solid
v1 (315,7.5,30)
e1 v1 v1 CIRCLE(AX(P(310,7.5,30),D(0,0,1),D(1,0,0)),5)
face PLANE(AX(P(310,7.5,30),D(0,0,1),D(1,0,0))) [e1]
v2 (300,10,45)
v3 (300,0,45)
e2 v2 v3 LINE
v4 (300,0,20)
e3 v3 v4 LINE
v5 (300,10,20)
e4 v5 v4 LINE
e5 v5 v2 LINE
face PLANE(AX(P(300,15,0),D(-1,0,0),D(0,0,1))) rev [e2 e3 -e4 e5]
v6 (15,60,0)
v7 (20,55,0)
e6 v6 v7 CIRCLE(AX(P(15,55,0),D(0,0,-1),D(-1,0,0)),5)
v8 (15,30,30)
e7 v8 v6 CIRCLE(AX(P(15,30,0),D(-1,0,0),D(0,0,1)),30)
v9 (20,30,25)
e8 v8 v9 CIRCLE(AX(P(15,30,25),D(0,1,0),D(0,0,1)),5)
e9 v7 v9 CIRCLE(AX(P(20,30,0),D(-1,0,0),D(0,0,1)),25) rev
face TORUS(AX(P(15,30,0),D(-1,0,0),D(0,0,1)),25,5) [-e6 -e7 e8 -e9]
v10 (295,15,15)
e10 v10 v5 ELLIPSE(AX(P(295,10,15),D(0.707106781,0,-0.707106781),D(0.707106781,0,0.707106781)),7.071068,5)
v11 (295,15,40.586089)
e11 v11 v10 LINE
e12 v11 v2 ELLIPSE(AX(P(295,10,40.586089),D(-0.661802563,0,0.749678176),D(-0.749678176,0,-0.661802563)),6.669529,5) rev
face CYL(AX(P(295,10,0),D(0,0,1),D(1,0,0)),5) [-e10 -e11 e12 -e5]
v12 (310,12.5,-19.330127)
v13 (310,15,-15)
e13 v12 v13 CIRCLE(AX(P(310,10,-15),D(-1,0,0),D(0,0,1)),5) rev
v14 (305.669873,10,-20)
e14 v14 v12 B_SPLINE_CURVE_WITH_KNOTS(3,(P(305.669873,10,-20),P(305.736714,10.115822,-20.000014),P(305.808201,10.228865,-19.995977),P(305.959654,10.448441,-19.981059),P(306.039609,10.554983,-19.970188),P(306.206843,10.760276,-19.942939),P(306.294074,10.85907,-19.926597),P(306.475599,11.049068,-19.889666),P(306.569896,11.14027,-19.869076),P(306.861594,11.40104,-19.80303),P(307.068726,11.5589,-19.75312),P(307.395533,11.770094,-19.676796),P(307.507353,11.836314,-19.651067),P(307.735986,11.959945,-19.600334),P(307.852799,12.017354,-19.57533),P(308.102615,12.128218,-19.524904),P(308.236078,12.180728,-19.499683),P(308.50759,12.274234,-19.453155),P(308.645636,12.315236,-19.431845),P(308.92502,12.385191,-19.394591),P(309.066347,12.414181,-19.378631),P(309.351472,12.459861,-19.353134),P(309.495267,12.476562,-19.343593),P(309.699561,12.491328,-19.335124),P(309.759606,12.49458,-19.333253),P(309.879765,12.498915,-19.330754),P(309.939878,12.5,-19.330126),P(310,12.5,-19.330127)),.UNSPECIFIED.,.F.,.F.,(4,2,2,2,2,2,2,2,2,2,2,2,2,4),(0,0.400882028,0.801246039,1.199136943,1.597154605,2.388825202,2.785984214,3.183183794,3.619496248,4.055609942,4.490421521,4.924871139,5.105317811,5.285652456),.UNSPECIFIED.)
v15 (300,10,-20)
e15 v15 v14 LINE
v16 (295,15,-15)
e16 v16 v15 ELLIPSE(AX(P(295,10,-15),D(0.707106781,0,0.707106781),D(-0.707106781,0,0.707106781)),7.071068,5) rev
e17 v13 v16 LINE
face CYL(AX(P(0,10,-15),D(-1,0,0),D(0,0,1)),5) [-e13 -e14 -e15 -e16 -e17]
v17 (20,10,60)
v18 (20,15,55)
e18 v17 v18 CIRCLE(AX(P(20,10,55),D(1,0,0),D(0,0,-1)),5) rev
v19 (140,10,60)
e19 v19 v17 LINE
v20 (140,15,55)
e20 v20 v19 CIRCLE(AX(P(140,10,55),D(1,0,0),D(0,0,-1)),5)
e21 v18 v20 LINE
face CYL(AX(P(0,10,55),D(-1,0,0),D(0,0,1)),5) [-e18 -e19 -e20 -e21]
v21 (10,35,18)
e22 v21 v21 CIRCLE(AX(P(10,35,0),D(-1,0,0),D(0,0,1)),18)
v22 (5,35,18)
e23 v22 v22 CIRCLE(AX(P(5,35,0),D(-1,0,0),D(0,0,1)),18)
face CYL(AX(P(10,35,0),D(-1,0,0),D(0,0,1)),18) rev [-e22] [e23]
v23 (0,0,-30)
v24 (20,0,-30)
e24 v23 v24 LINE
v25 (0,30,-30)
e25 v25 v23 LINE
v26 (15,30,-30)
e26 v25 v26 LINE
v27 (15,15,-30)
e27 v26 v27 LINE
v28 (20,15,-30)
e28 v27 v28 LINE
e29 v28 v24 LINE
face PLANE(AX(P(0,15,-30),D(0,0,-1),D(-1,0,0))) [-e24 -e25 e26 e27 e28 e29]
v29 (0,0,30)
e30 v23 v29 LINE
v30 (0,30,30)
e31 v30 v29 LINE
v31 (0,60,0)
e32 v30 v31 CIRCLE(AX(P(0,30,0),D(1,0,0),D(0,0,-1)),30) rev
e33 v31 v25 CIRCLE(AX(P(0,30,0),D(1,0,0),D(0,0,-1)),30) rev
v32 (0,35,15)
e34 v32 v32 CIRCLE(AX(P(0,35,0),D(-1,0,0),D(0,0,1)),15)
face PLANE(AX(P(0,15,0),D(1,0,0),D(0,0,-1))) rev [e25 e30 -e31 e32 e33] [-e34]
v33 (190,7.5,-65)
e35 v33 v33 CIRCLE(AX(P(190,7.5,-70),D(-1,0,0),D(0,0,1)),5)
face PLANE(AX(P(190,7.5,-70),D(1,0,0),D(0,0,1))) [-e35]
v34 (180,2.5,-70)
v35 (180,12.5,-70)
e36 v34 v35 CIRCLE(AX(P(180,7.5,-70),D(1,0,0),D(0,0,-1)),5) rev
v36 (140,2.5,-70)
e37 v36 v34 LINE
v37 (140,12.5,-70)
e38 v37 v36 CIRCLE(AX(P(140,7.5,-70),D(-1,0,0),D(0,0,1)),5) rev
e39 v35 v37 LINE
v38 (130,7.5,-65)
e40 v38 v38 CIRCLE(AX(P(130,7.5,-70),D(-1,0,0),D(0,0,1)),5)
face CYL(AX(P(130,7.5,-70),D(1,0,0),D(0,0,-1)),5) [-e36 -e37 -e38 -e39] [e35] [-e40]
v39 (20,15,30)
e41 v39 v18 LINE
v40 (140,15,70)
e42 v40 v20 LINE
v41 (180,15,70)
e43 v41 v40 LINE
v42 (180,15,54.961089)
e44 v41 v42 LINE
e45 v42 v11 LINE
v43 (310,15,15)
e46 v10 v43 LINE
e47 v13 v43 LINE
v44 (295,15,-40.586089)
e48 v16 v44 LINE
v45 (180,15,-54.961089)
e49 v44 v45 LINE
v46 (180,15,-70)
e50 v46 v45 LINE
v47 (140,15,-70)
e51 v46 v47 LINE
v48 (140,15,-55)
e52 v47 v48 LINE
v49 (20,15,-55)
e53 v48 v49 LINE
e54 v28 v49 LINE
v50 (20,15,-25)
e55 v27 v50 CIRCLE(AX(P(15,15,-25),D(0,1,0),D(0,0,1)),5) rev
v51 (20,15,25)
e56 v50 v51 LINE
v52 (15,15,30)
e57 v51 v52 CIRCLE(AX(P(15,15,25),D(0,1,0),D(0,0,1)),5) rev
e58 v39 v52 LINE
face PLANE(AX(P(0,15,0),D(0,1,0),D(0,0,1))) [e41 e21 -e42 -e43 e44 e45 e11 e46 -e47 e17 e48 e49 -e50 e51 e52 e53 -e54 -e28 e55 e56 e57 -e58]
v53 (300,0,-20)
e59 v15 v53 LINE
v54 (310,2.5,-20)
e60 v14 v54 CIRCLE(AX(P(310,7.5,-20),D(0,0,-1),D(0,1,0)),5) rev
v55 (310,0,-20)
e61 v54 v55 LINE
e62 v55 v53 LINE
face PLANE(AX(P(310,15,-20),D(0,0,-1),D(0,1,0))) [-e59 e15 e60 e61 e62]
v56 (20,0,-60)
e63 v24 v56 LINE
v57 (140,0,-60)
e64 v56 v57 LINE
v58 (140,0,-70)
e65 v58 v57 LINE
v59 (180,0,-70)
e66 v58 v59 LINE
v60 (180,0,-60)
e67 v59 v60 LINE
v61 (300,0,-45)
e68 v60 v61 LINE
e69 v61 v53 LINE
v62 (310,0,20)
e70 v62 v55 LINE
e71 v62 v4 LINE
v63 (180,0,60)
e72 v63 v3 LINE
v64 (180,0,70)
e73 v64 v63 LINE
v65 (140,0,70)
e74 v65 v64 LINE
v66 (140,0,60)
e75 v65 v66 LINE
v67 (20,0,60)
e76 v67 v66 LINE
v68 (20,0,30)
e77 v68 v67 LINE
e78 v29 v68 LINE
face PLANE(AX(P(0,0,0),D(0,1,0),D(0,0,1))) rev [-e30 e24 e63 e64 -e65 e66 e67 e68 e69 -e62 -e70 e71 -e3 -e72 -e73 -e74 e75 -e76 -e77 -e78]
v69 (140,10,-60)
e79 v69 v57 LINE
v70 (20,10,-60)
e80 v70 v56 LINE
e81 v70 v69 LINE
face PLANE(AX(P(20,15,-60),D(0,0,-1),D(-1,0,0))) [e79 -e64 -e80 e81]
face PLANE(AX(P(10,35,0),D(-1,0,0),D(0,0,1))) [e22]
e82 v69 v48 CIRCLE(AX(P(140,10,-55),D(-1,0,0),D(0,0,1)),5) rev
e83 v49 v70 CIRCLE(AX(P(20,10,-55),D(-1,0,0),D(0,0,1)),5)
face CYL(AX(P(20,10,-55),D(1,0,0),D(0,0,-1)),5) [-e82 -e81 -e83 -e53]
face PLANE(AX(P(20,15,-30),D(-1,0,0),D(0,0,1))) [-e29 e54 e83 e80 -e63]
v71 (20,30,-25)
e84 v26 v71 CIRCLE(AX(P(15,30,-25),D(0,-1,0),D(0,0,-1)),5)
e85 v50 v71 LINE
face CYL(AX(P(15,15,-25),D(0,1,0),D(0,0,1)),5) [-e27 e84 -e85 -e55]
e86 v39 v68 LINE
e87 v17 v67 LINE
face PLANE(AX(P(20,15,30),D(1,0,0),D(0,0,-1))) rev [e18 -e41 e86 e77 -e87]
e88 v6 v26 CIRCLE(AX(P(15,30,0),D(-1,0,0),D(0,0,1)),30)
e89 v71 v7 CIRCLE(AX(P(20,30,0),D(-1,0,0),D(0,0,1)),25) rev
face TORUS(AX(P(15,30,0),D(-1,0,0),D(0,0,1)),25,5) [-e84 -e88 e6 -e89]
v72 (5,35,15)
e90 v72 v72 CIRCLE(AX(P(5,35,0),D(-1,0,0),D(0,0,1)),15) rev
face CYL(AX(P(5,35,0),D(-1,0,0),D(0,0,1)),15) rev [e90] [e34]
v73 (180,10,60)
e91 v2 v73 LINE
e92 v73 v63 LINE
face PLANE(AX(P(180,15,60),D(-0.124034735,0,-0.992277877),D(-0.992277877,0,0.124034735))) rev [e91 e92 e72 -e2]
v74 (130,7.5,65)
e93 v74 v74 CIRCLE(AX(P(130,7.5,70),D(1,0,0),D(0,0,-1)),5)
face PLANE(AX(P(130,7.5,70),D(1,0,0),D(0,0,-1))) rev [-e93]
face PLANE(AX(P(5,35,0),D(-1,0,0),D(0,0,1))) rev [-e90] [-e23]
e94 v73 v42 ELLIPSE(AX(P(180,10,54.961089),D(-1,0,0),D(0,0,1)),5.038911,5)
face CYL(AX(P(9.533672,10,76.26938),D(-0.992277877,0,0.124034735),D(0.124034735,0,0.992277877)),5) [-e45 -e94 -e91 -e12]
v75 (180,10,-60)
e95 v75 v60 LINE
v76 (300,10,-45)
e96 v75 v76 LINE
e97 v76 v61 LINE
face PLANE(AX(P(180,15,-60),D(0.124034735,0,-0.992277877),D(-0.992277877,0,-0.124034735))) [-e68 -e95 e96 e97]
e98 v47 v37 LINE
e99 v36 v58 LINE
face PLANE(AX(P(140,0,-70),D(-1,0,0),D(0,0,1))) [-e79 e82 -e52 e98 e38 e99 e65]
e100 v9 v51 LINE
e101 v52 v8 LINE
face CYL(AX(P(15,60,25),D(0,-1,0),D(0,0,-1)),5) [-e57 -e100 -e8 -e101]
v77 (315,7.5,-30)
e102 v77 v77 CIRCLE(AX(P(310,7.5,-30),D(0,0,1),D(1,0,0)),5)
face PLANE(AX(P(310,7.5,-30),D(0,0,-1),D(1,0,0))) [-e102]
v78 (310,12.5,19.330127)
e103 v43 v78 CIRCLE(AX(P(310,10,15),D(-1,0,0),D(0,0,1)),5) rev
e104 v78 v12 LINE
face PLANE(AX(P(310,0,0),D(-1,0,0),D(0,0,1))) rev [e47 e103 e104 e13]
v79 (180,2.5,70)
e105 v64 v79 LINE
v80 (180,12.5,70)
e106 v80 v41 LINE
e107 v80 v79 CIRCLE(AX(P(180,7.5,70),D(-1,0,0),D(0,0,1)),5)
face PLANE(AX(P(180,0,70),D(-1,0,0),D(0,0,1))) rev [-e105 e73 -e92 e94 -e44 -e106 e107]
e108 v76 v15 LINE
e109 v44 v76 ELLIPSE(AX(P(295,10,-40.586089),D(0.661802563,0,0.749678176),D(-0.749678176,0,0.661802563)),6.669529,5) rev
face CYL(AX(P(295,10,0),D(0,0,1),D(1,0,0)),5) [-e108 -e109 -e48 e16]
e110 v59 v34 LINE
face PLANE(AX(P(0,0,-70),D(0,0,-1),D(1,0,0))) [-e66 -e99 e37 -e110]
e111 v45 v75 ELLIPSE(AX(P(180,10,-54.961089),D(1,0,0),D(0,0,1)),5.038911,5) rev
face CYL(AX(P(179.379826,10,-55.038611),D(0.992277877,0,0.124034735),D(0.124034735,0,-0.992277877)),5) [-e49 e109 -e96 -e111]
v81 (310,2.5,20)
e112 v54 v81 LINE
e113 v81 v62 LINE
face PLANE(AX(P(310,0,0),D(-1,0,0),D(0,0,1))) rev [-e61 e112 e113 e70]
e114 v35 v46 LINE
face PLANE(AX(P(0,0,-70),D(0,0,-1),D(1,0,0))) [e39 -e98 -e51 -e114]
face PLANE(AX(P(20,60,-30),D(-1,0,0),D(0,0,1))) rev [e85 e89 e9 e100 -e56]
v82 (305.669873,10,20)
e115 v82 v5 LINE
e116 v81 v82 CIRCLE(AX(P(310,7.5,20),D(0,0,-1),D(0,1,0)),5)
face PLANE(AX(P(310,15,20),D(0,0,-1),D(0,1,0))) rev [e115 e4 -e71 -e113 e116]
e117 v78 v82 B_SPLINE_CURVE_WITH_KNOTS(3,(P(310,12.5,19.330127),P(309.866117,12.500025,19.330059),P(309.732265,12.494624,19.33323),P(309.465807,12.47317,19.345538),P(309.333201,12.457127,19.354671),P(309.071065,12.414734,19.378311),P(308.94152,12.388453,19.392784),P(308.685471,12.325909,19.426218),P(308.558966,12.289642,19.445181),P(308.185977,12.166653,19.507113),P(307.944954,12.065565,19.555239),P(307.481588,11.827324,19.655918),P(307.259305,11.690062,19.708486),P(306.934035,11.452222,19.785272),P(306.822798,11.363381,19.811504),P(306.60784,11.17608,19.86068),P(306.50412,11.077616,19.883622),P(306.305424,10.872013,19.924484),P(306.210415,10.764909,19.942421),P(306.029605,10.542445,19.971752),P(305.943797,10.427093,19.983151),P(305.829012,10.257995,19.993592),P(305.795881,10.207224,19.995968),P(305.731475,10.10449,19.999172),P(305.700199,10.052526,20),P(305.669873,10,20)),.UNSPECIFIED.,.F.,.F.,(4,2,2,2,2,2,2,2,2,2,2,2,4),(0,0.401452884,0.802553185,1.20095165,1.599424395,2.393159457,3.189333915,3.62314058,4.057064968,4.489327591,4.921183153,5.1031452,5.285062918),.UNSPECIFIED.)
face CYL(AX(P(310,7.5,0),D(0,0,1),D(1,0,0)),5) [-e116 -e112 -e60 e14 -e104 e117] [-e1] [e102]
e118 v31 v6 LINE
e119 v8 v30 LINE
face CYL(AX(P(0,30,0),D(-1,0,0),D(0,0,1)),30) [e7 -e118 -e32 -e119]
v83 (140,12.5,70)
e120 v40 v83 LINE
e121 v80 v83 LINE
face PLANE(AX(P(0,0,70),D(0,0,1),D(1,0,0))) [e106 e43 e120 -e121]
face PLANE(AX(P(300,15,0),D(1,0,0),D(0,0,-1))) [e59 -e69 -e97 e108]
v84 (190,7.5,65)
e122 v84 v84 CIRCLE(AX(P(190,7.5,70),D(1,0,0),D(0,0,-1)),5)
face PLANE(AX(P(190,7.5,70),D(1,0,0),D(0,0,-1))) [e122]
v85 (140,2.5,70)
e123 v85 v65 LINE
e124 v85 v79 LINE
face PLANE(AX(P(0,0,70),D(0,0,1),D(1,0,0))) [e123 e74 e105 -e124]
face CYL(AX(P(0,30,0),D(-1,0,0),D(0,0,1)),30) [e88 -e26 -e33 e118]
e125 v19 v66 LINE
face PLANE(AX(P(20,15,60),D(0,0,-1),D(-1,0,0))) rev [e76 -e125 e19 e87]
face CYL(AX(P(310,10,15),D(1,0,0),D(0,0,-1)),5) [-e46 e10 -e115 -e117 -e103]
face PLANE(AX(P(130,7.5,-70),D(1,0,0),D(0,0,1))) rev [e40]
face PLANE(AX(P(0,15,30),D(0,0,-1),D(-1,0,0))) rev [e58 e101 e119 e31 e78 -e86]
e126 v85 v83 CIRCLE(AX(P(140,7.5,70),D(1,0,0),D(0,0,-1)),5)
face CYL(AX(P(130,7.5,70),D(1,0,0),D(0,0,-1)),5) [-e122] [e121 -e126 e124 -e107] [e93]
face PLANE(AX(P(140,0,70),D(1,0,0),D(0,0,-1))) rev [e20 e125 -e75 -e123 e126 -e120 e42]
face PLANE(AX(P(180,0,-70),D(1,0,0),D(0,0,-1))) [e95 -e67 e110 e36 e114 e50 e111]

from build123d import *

# Parameters (mm, degrees)
BOSS_EXTRUDE2_DEPTH = 15
SKETCH3_W           = 40
SKETCH3_H           = 15
BOSS_EXTRUDE3_DEPTH = 10
BOSS_EXTRUDE4_START = -50
SKETCH4_R           = 5
BOSS_EXTRUDE4_DEPTH = 60
SKETCH5_W           = 20
SKETCH5_H           = 15
BOSS_EXTRUDE5_DEPTH = 10
BOSS_EXTRUDE6_START = -20
SKETCH6_R           = 5
BOSS_EXTRUDE6_DEPTH = 30
SKETCH7_W           = 20
SKETCH7_H           = 60
BOSS_EXTRUDE7_DEPTH = 60
SKETCH9_R           = 15
CUT_EXTRUDE1_DEPTH  = 5
SKETCH10_R          = 18
CUT_EXTRUDE2_DEPTH  = 5
FILLET1_R           = 30
FILLET2_R           = 5


with BuildPart() as part:
    # Sketch1 → Boss-Extrude2 (new body)
    with BuildSketch(Plane(origin=(0, 0, 0), x_dir=(1, 0, 0), z_dir=(0, 1, 0))):
        Polygon((0, 0), (300, 0), (300, -45), (180, -60), (20, -60), (20, -30), (0, -30), align=None)
    boss_extrude2 = extrude(amount=BOSS_EXTRUDE2_DEPTH)

    # Sketch3 → Boss-Extrude3 (add)
    with BuildSketch(Plane.XY.offset(60)):
        with Locations((160, 7.5)):
            Rectangle(SKETCH3_W, SKETCH3_H)
    boss_extrude3 = extrude(amount=BOSS_EXTRUDE3_DEPTH)

    # Sketch4 → Boss-Extrude4 (add)
    with BuildSketch(Plane(origin=(180, 0, 0), x_dir=(0, 0, -1), z_dir=(1, 0, 0)).offset(BOSS_EXTRUDE4_START)):
        with Locations((-70, 7.5)):
            Circle(SKETCH4_R)
    boss_extrude4 = extrude(amount=BOSS_EXTRUDE4_DEPTH)

    # Sketch5 → Boss-Extrude5 (add)
    with BuildSketch(Plane(origin=(300, 0, 0), x_dir=(0, 0, -1), z_dir=(1, 0, 0))):
        with Locations((-10, 7.5)):
            Rectangle(SKETCH5_W, SKETCH5_H)
    boss_extrude5 = extrude(amount=BOSS_EXTRUDE5_DEPTH)

    # Sketch6 → Boss-Extrude6 (add)
    with BuildSketch(Plane.XY.offset(20).offset(BOSS_EXTRUDE6_START)):
        with Locations((310, 7.5)):
            Circle(SKETCH6_R)
    boss_extrude6 = extrude(amount=BOSS_EXTRUDE6_DEPTH)

    # Mirror1: Boss-Extrude2, Boss-Extrude3, Boss-Extrude4, Boss-Extrude5, Boss-Extrude6 across plane
    add(boss_extrude2.mirror(Plane(origin=(0, 15, 0), x_dir=(1, 0, 0), z_dir=(0, 0, 1))))
    add(boss_extrude3.mirror(Plane(origin=(0, 15, 0), x_dir=(1, 0, 0), z_dir=(0, 0, 1))))
    add(boss_extrude4.mirror(Plane(origin=(0, 15, 0), x_dir=(1, 0, 0), z_dir=(0, 0, 1))))
    add(boss_extrude5.mirror(Plane(origin=(0, 15, 0), x_dir=(1, 0, 0), z_dir=(0, 0, 1))))
    add(boss_extrude6.mirror(Plane(origin=(0, 15, 0), x_dir=(1, 0, 0), z_dir=(0, 0, 1))))

    # Sketch7 → Boss-Extrude7 (add)
    with BuildSketch(Plane(origin=(0, 0, 0), x_dir=(1, 0, 0), z_dir=(0, 1, 0))):
        with Locations((10, 0)):
            Rectangle(SKETCH7_W, SKETCH7_H)
    extrude(amount=BOSS_EXTRUDE7_DEPTH)

    # Sketch9 → Cut-Extrude1 (cut)
    with BuildSketch(Plane.ZY):
        with Locations((0, 35)):
            Circle(SKETCH9_R)
    extrude(amount=-CUT_EXTRUDE1_DEPTH, mode=Mode.SUBTRACT)

    # Sketch10 → Cut-Extrude2 (cut)
    with BuildSketch(Plane.ZY.offset(-5)):
        with Locations((0, 35)):
            Circle(SKETCH10_R)
    extrude(amount=-CUT_EXTRUDE2_DEPTH, mode=Mode.SUBTRACT)

    # Fillet1
    fillet1_edges = [part.edges().sort_by_distance(p)[0] for p in [
        (10, 60, -30),
        (10, 60, 30),
    ]]
    fillet(fillet1_edges, radius=FILLET1_R - 0.0001)  # a hair under: the kernel refuses the full size

    # Fillet2
    fillet2_edges = [part.edges().sort_by_distance(p)[0] for p in [
        (20, 22.50005, -30),
        (20, 51.213232725, -21.213232725),
        (20, 22.50005, 30),
        (240, 15, -52.5),
        (300, 15, -32.5),
        (305, 15, -20),
        (305, 15, 20),
        (300, 15, 32.5),
        (240, 15, 52.5),
        (80, 15, -60),
        (80, 15, 60),
        (20, 51.213232725, 21.213232725),
    ]]
    fillet(fillet2_edges, radius=FILLET2_R)


solid = part.part
